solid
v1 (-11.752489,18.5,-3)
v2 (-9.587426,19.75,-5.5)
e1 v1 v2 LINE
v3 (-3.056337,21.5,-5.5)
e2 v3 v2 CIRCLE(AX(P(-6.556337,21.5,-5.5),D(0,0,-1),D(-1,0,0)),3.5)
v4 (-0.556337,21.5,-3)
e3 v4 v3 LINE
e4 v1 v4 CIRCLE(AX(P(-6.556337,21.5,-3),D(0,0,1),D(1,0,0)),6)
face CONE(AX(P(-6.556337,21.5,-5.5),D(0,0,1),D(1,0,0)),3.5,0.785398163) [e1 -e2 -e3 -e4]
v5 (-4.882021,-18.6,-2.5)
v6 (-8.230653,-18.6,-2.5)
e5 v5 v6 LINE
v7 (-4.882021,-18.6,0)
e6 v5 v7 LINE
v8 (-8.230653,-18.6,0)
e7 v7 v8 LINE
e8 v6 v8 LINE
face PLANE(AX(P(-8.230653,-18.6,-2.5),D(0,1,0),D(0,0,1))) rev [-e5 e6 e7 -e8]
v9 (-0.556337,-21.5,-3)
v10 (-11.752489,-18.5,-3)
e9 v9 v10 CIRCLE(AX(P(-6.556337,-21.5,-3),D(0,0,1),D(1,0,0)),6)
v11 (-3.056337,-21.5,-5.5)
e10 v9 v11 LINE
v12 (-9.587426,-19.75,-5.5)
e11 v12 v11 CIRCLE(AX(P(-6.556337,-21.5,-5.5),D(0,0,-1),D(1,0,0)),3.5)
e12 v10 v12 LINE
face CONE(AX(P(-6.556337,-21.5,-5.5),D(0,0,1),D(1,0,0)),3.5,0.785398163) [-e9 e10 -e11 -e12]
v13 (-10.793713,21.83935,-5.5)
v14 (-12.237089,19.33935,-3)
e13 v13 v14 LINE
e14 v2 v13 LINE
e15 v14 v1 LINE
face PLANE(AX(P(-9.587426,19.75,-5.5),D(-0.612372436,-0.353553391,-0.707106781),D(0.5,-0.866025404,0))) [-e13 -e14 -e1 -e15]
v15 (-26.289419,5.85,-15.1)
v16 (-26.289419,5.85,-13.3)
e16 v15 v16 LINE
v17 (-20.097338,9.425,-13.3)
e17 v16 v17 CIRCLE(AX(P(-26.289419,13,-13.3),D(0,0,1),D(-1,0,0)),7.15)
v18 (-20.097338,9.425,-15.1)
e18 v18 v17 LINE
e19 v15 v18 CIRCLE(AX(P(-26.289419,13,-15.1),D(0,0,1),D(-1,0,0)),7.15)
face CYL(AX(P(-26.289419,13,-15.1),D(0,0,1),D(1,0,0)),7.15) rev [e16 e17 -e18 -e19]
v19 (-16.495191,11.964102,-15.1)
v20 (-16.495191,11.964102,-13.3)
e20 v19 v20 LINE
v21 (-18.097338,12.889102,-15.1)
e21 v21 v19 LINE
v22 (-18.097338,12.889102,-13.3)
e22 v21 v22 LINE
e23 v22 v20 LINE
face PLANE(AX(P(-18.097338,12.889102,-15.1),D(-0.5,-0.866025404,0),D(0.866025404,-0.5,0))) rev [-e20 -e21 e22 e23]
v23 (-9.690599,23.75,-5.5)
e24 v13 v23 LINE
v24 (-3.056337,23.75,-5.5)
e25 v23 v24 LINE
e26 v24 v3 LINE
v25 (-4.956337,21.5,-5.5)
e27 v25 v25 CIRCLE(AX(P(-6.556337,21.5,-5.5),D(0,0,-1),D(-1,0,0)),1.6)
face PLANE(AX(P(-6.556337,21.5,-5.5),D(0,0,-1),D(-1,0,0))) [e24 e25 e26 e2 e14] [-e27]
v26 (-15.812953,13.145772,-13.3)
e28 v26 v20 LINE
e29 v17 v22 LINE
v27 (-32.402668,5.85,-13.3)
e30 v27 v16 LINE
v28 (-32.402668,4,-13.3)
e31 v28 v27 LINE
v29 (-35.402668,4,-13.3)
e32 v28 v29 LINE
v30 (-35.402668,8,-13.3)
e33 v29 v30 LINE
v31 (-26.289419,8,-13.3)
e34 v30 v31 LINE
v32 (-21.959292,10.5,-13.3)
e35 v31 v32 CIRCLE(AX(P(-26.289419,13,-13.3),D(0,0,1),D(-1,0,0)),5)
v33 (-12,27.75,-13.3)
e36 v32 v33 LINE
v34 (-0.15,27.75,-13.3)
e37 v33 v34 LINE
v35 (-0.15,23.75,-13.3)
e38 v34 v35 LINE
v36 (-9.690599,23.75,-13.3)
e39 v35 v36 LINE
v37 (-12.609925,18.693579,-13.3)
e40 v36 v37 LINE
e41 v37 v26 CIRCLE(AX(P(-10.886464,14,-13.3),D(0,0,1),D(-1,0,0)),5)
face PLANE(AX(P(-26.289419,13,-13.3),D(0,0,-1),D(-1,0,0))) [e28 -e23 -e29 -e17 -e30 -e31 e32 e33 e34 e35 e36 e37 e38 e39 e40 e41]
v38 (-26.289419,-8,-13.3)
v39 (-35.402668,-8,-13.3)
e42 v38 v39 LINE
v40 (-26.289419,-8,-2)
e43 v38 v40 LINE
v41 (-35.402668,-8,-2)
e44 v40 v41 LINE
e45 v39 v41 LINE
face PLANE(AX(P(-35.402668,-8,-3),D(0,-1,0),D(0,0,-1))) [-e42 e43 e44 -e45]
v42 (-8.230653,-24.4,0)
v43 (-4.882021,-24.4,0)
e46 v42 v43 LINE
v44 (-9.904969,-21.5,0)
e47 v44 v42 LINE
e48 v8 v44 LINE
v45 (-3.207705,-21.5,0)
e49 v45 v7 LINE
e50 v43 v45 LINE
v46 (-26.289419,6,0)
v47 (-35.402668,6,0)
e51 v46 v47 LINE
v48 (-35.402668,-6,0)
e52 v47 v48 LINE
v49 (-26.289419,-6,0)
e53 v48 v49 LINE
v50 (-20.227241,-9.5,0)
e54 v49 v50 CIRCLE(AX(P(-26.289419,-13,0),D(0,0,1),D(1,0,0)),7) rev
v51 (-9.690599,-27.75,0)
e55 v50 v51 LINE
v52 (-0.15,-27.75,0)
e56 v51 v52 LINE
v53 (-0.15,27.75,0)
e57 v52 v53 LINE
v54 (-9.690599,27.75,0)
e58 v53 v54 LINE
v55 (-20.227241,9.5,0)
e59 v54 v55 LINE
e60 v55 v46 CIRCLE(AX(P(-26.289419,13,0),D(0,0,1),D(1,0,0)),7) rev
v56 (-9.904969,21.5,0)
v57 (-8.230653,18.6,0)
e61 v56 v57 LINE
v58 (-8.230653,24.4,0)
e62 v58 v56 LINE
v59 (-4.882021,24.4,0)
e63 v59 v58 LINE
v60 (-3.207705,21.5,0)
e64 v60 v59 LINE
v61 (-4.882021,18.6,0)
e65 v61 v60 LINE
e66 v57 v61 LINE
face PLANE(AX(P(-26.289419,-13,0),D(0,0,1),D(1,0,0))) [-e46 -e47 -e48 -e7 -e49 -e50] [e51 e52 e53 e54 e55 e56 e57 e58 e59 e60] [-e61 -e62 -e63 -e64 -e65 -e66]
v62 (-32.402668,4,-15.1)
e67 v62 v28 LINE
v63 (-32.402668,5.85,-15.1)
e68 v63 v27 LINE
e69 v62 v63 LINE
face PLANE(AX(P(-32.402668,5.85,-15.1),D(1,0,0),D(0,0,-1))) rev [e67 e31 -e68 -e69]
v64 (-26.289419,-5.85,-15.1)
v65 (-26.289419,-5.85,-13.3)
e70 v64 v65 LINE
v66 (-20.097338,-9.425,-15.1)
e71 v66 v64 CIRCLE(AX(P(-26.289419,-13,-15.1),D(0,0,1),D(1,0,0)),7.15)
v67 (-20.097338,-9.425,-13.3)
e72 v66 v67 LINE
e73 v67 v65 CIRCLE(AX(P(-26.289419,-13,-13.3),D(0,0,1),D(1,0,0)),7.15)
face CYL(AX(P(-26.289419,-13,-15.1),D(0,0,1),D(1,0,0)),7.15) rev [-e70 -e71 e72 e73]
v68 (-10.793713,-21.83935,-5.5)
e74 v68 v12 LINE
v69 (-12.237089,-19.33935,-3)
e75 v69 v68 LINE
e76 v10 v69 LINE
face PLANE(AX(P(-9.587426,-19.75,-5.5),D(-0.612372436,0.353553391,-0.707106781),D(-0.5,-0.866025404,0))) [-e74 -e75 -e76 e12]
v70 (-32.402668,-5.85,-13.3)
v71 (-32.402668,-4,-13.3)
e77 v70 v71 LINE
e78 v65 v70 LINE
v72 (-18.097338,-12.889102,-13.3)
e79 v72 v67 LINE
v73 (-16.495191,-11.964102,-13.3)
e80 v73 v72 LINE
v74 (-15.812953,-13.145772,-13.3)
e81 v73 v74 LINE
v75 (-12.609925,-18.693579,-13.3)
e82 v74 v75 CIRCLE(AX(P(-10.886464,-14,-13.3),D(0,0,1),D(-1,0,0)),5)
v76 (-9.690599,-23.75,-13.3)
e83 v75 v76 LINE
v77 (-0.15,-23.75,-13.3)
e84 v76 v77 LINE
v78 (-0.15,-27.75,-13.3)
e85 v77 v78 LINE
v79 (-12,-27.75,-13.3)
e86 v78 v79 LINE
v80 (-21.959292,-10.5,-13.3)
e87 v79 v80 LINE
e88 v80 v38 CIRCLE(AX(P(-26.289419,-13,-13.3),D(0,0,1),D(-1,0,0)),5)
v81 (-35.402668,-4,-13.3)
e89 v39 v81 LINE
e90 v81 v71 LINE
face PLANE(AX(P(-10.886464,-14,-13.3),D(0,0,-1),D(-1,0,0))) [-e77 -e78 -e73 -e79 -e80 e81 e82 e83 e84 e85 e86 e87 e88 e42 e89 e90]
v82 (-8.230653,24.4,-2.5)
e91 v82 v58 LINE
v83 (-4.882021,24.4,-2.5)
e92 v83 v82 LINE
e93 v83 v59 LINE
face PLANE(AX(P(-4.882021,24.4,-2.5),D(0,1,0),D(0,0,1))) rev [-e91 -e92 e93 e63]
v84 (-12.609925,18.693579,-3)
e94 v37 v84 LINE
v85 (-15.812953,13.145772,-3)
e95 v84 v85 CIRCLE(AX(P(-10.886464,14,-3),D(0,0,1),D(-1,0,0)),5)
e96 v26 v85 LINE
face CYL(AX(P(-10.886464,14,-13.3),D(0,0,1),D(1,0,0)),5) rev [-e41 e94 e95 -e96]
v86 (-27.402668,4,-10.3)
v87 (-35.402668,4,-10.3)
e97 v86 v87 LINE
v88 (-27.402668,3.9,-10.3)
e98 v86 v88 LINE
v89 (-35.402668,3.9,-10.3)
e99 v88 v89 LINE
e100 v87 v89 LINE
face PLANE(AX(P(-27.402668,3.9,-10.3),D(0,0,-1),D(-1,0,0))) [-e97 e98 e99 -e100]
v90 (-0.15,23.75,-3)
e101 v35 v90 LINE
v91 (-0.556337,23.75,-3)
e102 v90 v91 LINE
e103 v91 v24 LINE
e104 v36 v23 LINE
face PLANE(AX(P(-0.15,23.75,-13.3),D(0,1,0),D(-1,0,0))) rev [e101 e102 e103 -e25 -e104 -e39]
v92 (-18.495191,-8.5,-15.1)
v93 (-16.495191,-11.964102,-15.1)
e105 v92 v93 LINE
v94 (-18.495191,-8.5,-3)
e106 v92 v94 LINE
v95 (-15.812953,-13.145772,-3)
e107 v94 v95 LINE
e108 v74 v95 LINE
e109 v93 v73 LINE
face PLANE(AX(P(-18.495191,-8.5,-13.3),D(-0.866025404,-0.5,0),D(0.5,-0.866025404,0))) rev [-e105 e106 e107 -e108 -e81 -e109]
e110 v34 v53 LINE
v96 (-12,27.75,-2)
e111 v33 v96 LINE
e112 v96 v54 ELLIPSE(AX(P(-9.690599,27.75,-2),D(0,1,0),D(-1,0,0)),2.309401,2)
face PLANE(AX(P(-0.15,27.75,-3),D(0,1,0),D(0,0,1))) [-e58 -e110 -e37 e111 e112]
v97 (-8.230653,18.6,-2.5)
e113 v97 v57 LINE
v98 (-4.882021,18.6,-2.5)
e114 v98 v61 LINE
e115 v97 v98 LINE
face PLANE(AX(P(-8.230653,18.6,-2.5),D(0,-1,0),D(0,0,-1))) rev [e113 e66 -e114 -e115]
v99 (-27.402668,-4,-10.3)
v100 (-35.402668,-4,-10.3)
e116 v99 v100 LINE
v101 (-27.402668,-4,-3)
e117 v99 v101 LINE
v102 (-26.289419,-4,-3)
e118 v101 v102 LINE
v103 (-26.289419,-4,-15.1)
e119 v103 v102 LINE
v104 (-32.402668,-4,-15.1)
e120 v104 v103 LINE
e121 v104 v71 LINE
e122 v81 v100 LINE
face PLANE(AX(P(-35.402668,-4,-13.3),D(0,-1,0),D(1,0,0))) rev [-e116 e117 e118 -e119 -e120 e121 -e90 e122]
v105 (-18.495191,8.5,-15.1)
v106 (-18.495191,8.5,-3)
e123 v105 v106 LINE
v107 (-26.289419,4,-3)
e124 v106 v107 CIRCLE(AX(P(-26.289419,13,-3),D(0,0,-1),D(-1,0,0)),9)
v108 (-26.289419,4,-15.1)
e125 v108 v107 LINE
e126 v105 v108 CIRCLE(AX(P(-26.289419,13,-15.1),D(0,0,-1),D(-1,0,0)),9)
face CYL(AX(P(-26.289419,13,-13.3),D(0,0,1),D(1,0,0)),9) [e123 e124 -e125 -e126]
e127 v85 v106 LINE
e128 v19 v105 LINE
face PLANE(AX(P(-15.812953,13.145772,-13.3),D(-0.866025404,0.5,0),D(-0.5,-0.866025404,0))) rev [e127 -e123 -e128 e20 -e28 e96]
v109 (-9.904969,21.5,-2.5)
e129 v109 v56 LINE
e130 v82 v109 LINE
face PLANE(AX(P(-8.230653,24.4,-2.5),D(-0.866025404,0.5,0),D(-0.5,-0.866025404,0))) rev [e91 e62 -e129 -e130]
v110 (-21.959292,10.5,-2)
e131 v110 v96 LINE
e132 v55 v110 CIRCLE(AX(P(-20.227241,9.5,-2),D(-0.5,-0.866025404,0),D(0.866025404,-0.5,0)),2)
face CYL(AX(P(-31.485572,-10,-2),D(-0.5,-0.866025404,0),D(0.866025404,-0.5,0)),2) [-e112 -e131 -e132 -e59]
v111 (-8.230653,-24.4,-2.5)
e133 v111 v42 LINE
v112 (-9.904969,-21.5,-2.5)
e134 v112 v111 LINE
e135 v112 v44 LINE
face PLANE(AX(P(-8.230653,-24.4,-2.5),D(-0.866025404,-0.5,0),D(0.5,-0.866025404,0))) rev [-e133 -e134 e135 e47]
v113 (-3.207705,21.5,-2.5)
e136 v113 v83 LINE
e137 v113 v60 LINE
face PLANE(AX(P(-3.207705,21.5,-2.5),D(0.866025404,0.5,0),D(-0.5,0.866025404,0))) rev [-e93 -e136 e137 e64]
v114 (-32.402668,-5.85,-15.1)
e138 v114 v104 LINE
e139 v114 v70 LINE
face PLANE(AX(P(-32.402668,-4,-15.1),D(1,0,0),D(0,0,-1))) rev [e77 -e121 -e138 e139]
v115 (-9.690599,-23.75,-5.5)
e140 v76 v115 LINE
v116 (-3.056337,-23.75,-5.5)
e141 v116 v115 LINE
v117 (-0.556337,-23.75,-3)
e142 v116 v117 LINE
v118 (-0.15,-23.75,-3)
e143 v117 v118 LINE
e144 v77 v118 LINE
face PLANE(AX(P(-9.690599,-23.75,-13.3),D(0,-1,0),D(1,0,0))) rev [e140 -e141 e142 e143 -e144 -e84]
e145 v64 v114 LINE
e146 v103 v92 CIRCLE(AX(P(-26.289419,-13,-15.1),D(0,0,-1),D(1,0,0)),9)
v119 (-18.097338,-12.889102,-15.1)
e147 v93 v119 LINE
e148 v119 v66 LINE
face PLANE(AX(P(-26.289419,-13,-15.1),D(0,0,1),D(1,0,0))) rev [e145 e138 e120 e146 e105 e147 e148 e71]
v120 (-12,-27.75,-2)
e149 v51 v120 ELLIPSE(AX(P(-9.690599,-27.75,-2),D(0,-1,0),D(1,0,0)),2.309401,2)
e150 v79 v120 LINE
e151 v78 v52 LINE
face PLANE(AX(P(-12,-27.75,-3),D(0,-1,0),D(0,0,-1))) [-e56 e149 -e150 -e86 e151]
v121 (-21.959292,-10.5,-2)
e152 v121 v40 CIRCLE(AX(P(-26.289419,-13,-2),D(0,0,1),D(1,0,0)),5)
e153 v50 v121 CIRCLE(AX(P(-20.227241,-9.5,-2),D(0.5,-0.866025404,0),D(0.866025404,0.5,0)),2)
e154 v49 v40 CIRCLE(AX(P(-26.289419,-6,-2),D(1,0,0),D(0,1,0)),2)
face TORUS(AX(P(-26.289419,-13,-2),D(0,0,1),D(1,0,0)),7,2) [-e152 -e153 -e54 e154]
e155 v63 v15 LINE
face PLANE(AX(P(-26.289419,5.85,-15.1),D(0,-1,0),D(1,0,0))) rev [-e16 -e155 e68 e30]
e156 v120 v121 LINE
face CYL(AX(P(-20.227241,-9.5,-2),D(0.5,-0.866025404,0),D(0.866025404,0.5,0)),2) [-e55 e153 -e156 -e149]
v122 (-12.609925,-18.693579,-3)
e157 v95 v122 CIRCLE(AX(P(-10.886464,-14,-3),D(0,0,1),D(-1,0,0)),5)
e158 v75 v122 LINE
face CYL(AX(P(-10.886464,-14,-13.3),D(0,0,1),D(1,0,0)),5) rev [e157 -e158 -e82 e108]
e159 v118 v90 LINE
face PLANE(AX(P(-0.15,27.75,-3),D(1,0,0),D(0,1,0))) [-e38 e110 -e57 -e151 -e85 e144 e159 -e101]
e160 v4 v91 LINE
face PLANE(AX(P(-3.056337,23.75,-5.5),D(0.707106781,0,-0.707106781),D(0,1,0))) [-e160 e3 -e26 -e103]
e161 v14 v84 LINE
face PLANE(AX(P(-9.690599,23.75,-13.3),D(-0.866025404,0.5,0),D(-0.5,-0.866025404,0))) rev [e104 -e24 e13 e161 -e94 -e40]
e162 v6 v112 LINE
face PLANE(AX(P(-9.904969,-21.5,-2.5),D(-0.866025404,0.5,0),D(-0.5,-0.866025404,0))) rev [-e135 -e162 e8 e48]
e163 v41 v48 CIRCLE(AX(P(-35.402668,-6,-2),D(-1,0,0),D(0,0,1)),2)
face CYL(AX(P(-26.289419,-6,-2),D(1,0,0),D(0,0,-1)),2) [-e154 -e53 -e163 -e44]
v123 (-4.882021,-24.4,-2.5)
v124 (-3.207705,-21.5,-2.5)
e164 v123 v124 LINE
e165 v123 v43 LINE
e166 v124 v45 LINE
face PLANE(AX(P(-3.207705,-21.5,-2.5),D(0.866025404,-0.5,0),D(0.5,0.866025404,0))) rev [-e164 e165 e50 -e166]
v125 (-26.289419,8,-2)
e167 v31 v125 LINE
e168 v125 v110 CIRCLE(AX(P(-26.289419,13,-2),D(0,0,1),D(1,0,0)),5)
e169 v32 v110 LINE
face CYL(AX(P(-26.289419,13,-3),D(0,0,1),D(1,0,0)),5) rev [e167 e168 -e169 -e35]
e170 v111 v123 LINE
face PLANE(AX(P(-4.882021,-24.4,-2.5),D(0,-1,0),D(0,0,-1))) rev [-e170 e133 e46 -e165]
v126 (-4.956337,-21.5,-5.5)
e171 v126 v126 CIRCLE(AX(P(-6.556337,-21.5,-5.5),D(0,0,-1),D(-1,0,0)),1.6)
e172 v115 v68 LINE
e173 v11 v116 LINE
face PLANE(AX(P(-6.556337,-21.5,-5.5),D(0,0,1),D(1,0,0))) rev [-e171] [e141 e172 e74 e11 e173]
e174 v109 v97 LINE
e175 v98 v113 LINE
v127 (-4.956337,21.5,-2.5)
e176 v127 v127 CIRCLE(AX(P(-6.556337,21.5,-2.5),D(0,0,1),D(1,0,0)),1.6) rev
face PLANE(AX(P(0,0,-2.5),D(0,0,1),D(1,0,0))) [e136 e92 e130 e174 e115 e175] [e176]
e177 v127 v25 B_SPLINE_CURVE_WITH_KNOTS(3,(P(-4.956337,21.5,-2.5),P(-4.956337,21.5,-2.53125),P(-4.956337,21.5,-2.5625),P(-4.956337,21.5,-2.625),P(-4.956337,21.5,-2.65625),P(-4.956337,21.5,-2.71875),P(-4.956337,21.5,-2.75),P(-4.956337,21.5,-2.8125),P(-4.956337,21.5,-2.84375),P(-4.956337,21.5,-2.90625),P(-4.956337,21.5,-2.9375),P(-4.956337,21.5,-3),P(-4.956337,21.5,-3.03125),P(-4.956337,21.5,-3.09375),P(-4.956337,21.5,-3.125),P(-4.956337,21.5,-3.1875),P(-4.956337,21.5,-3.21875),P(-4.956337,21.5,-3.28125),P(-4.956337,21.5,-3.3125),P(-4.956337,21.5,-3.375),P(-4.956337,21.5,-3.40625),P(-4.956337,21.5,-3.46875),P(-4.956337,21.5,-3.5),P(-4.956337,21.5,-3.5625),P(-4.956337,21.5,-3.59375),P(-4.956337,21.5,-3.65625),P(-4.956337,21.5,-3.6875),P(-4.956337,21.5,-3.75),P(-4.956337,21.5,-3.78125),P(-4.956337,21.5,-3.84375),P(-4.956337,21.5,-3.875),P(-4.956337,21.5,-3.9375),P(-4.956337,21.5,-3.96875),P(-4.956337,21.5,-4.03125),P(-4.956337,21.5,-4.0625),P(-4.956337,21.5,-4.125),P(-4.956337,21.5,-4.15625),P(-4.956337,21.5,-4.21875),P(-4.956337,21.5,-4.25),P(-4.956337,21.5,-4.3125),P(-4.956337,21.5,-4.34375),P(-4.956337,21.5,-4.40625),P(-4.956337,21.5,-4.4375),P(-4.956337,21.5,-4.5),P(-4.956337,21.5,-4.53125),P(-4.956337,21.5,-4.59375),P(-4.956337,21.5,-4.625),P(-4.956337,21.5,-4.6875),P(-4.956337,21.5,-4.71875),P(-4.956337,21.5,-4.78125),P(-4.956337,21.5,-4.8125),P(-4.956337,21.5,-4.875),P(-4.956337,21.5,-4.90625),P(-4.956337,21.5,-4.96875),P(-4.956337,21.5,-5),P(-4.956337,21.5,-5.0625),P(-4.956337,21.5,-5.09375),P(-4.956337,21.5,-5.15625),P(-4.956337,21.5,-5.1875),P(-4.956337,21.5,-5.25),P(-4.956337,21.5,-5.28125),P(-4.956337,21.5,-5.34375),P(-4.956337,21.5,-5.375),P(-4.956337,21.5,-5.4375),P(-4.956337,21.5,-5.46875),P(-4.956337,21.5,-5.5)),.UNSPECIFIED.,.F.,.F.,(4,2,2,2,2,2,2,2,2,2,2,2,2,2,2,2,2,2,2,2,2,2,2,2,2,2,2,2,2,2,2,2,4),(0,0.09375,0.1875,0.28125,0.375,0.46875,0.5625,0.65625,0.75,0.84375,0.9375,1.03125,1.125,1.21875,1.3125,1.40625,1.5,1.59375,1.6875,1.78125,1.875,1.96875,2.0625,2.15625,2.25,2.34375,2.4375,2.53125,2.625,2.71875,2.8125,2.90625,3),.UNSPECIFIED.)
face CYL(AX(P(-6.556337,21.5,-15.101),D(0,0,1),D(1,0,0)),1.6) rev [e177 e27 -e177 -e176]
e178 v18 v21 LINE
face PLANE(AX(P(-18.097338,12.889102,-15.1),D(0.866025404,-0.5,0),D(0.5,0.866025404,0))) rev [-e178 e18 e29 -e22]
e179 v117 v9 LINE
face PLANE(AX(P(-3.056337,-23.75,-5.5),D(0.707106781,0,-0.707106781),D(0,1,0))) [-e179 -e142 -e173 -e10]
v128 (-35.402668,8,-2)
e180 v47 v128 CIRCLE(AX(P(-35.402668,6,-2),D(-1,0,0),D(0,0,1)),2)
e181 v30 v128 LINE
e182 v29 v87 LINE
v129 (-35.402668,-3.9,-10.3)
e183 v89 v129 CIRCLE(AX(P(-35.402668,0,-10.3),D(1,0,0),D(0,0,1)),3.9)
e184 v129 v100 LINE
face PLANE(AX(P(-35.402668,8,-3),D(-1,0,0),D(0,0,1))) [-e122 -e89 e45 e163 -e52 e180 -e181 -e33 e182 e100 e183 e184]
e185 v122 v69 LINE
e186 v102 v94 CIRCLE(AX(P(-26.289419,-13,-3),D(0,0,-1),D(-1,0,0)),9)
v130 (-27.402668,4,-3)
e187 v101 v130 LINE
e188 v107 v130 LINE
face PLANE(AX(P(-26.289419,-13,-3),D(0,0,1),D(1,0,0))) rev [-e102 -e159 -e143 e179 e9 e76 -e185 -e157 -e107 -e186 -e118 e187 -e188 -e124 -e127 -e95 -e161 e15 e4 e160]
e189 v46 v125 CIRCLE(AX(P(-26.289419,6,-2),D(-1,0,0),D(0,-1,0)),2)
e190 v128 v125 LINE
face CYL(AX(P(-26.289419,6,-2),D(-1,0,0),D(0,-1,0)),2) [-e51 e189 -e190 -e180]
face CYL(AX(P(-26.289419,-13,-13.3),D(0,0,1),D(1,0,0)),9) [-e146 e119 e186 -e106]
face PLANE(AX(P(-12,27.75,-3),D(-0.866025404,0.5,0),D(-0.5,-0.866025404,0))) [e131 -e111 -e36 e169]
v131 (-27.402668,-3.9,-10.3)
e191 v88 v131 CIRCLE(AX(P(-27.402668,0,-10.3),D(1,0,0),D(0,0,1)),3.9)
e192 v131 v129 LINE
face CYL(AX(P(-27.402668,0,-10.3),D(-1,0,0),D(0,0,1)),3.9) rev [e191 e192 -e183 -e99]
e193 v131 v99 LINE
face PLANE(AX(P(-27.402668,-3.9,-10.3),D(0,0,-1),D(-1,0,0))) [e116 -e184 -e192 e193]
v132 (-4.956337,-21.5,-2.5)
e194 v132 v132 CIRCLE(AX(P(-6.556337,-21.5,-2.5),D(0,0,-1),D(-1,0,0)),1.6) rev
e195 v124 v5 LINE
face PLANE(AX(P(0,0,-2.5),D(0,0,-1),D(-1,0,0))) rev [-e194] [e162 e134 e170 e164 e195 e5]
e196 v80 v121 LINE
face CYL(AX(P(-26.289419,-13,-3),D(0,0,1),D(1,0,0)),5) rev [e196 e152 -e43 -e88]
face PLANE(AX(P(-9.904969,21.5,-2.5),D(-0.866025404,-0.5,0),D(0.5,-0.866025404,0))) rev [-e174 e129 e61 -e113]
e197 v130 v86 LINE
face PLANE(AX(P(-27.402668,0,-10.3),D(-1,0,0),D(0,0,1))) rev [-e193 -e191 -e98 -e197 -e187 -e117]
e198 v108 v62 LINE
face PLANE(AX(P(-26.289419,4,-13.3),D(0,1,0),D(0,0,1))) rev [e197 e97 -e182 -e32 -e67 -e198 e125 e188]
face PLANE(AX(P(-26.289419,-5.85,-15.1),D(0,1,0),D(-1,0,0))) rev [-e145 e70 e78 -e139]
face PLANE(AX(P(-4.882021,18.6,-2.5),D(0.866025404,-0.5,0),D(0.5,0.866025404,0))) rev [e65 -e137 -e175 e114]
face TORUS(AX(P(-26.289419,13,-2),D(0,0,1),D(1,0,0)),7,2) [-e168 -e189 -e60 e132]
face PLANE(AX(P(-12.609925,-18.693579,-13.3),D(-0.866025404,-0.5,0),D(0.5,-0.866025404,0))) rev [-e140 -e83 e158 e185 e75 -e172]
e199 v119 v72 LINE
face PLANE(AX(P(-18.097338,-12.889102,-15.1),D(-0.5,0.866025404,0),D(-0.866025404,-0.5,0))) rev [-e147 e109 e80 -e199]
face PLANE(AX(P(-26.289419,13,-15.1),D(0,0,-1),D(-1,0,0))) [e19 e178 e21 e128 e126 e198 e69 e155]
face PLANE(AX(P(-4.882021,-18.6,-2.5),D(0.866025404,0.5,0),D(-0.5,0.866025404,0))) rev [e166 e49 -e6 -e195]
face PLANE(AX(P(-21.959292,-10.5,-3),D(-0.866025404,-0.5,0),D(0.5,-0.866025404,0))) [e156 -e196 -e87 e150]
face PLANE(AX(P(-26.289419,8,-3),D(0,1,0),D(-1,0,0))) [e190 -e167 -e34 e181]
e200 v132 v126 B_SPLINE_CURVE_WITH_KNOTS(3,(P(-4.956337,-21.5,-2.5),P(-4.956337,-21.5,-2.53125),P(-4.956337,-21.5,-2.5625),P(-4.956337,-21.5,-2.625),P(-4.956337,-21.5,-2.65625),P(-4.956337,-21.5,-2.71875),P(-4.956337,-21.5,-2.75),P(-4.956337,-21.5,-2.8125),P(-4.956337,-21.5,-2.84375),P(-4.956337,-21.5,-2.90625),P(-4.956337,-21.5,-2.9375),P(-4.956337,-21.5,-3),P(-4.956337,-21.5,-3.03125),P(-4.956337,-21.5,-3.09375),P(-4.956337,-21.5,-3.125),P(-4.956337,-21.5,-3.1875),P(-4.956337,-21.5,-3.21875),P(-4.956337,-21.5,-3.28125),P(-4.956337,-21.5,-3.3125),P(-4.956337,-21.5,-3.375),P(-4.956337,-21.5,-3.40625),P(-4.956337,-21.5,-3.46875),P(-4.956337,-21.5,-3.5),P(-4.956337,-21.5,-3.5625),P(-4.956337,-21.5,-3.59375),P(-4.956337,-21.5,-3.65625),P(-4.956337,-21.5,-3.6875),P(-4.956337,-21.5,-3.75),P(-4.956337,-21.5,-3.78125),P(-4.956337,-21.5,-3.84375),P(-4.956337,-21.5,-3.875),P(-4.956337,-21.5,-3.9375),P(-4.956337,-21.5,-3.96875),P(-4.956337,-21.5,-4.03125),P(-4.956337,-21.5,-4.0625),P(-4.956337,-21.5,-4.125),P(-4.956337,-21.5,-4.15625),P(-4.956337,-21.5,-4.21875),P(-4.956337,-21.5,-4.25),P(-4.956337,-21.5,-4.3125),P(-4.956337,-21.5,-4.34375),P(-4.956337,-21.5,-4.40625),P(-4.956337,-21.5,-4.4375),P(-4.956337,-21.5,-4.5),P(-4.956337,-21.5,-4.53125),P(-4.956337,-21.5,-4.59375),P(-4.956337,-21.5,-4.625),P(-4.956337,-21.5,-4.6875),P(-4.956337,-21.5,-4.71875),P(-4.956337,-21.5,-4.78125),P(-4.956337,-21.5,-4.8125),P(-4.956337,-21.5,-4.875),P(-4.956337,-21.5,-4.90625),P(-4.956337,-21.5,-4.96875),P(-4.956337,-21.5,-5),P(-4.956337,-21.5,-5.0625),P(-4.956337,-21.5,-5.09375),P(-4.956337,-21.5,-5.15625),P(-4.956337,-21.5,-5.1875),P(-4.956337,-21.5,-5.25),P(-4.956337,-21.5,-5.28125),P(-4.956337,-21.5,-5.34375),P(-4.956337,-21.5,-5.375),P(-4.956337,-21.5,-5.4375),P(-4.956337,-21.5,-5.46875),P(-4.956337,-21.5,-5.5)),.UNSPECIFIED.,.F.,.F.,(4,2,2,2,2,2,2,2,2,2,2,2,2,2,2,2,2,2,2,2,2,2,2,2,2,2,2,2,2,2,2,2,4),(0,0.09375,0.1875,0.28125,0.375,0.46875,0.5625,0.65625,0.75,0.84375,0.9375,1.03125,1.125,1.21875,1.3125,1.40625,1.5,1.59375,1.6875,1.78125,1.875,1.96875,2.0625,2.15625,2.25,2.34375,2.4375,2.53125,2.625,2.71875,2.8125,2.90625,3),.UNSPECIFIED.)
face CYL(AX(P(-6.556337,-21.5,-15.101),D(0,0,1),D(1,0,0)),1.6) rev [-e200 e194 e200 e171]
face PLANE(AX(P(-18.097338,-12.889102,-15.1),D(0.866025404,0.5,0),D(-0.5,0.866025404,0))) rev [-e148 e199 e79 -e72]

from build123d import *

# Parameters (mm, degrees)
EXTRUDE_1_DEPTH     = 3
EXTRUDE_2_DEPTH     = 10.3
EXTRUDE_3_DEPTH     = 1.8
FILLET_1_R          = 2
CUT_EXTRUDE_1_DEPTH = 2.5
CUT_EXTRUDE_2_REACH = 49.449
SKETCH_7_R          = 1.6
SKETCH_8_R          = 1.6
EXTRUDE_4_DEPTH     = 2.5
CHAMFER_1_SIZE      = 2.5
EXTRUDE_5_DEPTH     = 8


with BuildPart() as part:
    # Эскиз3 → Бобышка-Вытянуть1 (new body)
    with BuildSketch(Plane.XY):
        with BuildLine():
            Line((-35.402667816, -8), (-26.289419162, -8))
            ThreePointArc((-26.289419162, -8), (-23.789419162, -8.669872981), (-21.959292144, -10.5))
            Line((-21.959292144, -10.5), (-12, -27.75))
            Line((-12, -27.75), (-0.15, -27.75))
            Line((-0.15, -27.75), (-0.15, 27.75))
            Line((-0.15, 27.75), (-12, 27.75))
            Line((-12, 27.75), (-21.959292144, 10.5))
            ThreePointArc((-21.959292144, 10.5), (-23.789419162, 8.669872981), (-26.289419162, 8))
            Line((-26.289419162, 8), (-35.402667816, 8))
            Line((-35.402667816, 8), (-35.402667816, -8))
        make_face()
    extrude(amount=-EXTRUDE_1_DEPTH)

    # Эскиз4 → Бобышка-Вытянуть2 (add)
    with BuildSketch(Plane(origin=(0, 0, -3), x_dir=(-1, 0, 0), z_dir=(0, 0, -1))):
        with BuildLine():
            Line((12, -27.75), (0.15, -27.75))
            Line((0.15, -27.75), (0.15, -23.75))
            Line((0.15, -23.75), (9.690598923, -23.75))
            Line((9.690598923, -23.75), (12.609925056, -18.693578815))
            ThreePointArc((12.609925056, -18.693578815), (15.216591048, -16.5), (15.81295303, -13.145771625))
            Line((15.81295303, -13.145771625), (18.495190528, -8.5))
            ThreePointArc((18.495190528, -8.5), (21.789419162, -5.205771366), (26.289419162, -4))
            Line((26.289419162, -4), (35.402667816, -4))
            Line((35.402667816, -4), (35.402667816, -8))
            Line((35.402667816, -8), (26.289419162, -8))
            ThreePointArc((26.289419162, -8), (23.789419162, -8.669872981), (21.959292144, -10.5))
            Line((21.959292144, -10.5), (12, -27.75))
        make_face()
        with BuildLine():
            Line((26.289419162, 8), (35.402667816, 8))
            Line((35.402667816, 8), (35.402667816, 4))
            Line((35.402667816, 4), (26.289419162, 4))
            ThreePointArc((26.289419162, 4), (21.789419162, 5.205771366), (18.495190528, 8.5))
            Line((18.495190528, 8.5), (15.81295303, 13.145771625))
            ThreePointArc((15.81295303, 13.145771625), (15.216591048, 16.5), (12.609925056, 18.693578815))
            Line((12.609925056, 18.693578815), (9.690598923, 23.75))
            Line((9.690598923, 23.75), (0.15, 23.75))
            Line((0.15, 23.75), (0.15, 27.75))
            Line((0.15, 27.75), (12, 27.75))
            Line((12, 27.75), (21.959292144, 10.5))
            ThreePointArc((21.959292144, 10.5), (23.789419162, 8.669872981), (26.289419162, 8))
        make_face()
    extrude(amount=EXTRUDE_2_DEPTH)

    # Эскиз5 → Бобышка-Вытянуть3 (add)
    with BuildSketch(Plane(origin=(0, 0, -13.3), x_dir=(-1, 0, 0), z_dir=(0, 0, -1))):
        with BuildLine():
            Line((18.495190528, -8.5), (16.495190528, -11.964101615))
            Line((16.495190528, -11.964101615), (18.097337525, -12.889101615))
            Line((18.097337525, -12.889101615), (20.097337525, -9.425))
            ThreePointArc((20.097337525, -9.425), (22.714419162, -6.807918363), (26.289419162, -5.85))
            Line((26.289419162, -5.85), (32.402667816, -5.85))
            Line((32.402667816, -5.85), (32.402667816, -4))
            Line((32.402667816, -4), (26.289419162, -4))
            ThreePointArc((26.289419162, -4), (21.789419162, -5.205771366), (18.495190528, -8.5))
        make_face()
        with BuildLine():
            Line((32.402667816, 4), (26.289419162, 4))
            ThreePointArc((26.289419162, 4), (21.789419162, 5.205771366), (18.495190528, 8.5))
            Line((18.495190528, 8.5), (16.495190528, 11.964101615))
            Line((16.495190528, 11.964101615), (18.097337525, 12.889101615))
            Line((18.097337525, 12.889101615), (20.097337525, 9.425))
            ThreePointArc((20.097337525, 9.425), (22.714419162, 6.807918363), (26.289419162, 5.85))
            Line((26.289419162, 5.85), (32.402667816, 5.85))
            Line((32.402667816, 5.85), (32.402667816, 4))
        make_face()
    extrude(amount=EXTRUDE_3_DEPTH)

    # Скругление1
    fillet_1_edges = [part.edges().sort_by_distance(p)[0] for p in [
        (-30.846043489, 8, 0),
        (-23.789419162, 8.669872981, 0),
        (-16.979646072, 19.125, 0),
        (-16.979646072, -19.125, 0),
        (-23.789419162, -8.669872981, 0),
        (-30.846043489, -8, 0),
    ]]
    fillet(fillet_1_edges, radius=FILLET_1_R)

    # Эскиз6 → Вырез-Вытянуть1 (cut)
    with BuildSketch(Plane.XY):
        Polygon((-8.230652791, 24.4), (-9.904968571, 21.5), (-8.230652791, 18.6), (-4.882021229, 18.6), (-3.207705449, 21.5), (-4.882021229, 24.4), align=None)
        Polygon((-4.882021229, -24.4), (-8.230652791, -24.4), (-9.904968571, -21.5), (-8.230652791, -18.6), (-4.882021229, -18.6), (-3.207705449, -21.5), align=None)
    extrude(amount=-CUT_EXTRUDE_1_DEPTH, mode=Mode.SUBTRACT)

    # Эскиз7 → Вырез-Вытянуть2 (cut, up to next)
    with BuildSketch(Plane.XY, mode=Mode.PRIVATE) as cut_extrude_2_sk1:
        with Locations((-6.55633701, 21.5)):
            Circle(SKETCH_7_R)
    cut_extrude_2_tool1 = extrude(cut_extrude_2_sk1.sketch, amount=-CUT_EXTRUDE_2_REACH, mode=Mode.PRIVATE) & part.part
    # Эскиз7 → Вырез-Вытянуть2 (cut, up to next)
    with BuildSketch(Plane.XY, mode=Mode.PRIVATE) as cut_extrude_2_sk2:
        with Locations((-6.55633701, -21.5)):
            Circle(SKETCH_7_R)
    cut_extrude_2_tool2 = extrude(cut_extrude_2_sk2.sketch, amount=-CUT_EXTRUDE_2_REACH, mode=Mode.PRIVATE) & part.part
    add(cut_extrude_2_tool1.solids().sort_by_distance((-6.556337, 21.5, 0))[0], mode=Mode.SUBTRACT)
    add(cut_extrude_2_tool2.solids().sort_by_distance((-6.556337, -21.5, 0))[0], mode=Mode.SUBTRACT)

    # Эскиз8 → Бобышка-Вытянуть4 (add)
    # profile 1 of 2: a face of its own
    with BuildSketch(Plane(origin=(0, 0, -3), x_dir=(-1, 0, 0), z_dir=(0, 0, -1))):
        with BuildLine():
            Line((9.587425923, 19.75), (10.793712962, 21.839350439))
            Line((10.793712962, 21.839350439), (9.690598923, 23.75))
            Line((9.690598923, 23.75), (3.05633701, 23.75))
            Line((3.05633701, 23.75), (3.05633701, 21.5))
            ThreePointArc((3.05633701, 21.5), (5.650470352, 18.119259608), (9.587425923, 19.75))
        make_face()
        with Locations(Location((6.55633701, 21.5, 0), (0, 0, 180))):
            Circle(SKETCH_8_R, mode=Mode.SUBTRACT)
    # profile 2 of 2: a face of its own
    with BuildSketch(Plane(origin=(0, 0, -3), x_dir=(-1, 0, 0), z_dir=(0, 0, -1))):
        with BuildLine():
            Line((3.05633701, -23.75), (3.05633701, -21.5))
            ThreePointArc((3.05633701, -21.5), (5.650470352, -18.119259608), (9.587425923, -19.75))
            Line((9.587425923, -19.75), (10.793712962, -21.839350439))
            Line((10.793712962, -21.839350439), (9.690598923, -23.75))
            Line((9.690598923, -23.75), (3.05633701, -23.75))
        make_face()
        with Locations(Location((6.55633701, -21.5, 0), (0, 0, 180))):
            Circle(SKETCH_8_R, mode=Mode.SUBTRACT)
    extrude(amount=EXTRUDE_4_DEPTH)

    # Фаска1
    chamfer_1_edges = [part.edges().sort_by_distance(p)[0] for p in [
        (-10.190569442, -20.79467522, -3),
        (-3.05633701, -22.625, -3),
        (-5.650470352, -18.119259608, -3),
        (-3.05633701, 22.625, -3),
        (-10.190569442, 20.79467522, -3),
        (-5.650470352, 18.119259608, -3),
    ]]
    chamfer(chamfer_1_edges, length=CHAMFER_1_SIZE - 0.0001)  # a hair under: the kernel refuses the full size

    # Эскиз10 → Бобышка-Вытянуть5 (add)
    with BuildSketch(Plane.ZY.offset(35.402667816)):
        with BuildLine():
            Line((-10.3, 4), (-3, 4))
            Line((-3, 4), (-3, -4))
            Line((-3, -4), (-10.3, -4))
            Line((-10.3, -4), (-10.3, -3.9))
            ThreePointArc((-10.3, -3.9), (-6.4, 0), (-10.3, 3.9))
            Line((-10.3, 3.9), (-10.3, 4))
        make_face()
    extrude(amount=-EXTRUDE_5_DEPTH)


solid = part.part
